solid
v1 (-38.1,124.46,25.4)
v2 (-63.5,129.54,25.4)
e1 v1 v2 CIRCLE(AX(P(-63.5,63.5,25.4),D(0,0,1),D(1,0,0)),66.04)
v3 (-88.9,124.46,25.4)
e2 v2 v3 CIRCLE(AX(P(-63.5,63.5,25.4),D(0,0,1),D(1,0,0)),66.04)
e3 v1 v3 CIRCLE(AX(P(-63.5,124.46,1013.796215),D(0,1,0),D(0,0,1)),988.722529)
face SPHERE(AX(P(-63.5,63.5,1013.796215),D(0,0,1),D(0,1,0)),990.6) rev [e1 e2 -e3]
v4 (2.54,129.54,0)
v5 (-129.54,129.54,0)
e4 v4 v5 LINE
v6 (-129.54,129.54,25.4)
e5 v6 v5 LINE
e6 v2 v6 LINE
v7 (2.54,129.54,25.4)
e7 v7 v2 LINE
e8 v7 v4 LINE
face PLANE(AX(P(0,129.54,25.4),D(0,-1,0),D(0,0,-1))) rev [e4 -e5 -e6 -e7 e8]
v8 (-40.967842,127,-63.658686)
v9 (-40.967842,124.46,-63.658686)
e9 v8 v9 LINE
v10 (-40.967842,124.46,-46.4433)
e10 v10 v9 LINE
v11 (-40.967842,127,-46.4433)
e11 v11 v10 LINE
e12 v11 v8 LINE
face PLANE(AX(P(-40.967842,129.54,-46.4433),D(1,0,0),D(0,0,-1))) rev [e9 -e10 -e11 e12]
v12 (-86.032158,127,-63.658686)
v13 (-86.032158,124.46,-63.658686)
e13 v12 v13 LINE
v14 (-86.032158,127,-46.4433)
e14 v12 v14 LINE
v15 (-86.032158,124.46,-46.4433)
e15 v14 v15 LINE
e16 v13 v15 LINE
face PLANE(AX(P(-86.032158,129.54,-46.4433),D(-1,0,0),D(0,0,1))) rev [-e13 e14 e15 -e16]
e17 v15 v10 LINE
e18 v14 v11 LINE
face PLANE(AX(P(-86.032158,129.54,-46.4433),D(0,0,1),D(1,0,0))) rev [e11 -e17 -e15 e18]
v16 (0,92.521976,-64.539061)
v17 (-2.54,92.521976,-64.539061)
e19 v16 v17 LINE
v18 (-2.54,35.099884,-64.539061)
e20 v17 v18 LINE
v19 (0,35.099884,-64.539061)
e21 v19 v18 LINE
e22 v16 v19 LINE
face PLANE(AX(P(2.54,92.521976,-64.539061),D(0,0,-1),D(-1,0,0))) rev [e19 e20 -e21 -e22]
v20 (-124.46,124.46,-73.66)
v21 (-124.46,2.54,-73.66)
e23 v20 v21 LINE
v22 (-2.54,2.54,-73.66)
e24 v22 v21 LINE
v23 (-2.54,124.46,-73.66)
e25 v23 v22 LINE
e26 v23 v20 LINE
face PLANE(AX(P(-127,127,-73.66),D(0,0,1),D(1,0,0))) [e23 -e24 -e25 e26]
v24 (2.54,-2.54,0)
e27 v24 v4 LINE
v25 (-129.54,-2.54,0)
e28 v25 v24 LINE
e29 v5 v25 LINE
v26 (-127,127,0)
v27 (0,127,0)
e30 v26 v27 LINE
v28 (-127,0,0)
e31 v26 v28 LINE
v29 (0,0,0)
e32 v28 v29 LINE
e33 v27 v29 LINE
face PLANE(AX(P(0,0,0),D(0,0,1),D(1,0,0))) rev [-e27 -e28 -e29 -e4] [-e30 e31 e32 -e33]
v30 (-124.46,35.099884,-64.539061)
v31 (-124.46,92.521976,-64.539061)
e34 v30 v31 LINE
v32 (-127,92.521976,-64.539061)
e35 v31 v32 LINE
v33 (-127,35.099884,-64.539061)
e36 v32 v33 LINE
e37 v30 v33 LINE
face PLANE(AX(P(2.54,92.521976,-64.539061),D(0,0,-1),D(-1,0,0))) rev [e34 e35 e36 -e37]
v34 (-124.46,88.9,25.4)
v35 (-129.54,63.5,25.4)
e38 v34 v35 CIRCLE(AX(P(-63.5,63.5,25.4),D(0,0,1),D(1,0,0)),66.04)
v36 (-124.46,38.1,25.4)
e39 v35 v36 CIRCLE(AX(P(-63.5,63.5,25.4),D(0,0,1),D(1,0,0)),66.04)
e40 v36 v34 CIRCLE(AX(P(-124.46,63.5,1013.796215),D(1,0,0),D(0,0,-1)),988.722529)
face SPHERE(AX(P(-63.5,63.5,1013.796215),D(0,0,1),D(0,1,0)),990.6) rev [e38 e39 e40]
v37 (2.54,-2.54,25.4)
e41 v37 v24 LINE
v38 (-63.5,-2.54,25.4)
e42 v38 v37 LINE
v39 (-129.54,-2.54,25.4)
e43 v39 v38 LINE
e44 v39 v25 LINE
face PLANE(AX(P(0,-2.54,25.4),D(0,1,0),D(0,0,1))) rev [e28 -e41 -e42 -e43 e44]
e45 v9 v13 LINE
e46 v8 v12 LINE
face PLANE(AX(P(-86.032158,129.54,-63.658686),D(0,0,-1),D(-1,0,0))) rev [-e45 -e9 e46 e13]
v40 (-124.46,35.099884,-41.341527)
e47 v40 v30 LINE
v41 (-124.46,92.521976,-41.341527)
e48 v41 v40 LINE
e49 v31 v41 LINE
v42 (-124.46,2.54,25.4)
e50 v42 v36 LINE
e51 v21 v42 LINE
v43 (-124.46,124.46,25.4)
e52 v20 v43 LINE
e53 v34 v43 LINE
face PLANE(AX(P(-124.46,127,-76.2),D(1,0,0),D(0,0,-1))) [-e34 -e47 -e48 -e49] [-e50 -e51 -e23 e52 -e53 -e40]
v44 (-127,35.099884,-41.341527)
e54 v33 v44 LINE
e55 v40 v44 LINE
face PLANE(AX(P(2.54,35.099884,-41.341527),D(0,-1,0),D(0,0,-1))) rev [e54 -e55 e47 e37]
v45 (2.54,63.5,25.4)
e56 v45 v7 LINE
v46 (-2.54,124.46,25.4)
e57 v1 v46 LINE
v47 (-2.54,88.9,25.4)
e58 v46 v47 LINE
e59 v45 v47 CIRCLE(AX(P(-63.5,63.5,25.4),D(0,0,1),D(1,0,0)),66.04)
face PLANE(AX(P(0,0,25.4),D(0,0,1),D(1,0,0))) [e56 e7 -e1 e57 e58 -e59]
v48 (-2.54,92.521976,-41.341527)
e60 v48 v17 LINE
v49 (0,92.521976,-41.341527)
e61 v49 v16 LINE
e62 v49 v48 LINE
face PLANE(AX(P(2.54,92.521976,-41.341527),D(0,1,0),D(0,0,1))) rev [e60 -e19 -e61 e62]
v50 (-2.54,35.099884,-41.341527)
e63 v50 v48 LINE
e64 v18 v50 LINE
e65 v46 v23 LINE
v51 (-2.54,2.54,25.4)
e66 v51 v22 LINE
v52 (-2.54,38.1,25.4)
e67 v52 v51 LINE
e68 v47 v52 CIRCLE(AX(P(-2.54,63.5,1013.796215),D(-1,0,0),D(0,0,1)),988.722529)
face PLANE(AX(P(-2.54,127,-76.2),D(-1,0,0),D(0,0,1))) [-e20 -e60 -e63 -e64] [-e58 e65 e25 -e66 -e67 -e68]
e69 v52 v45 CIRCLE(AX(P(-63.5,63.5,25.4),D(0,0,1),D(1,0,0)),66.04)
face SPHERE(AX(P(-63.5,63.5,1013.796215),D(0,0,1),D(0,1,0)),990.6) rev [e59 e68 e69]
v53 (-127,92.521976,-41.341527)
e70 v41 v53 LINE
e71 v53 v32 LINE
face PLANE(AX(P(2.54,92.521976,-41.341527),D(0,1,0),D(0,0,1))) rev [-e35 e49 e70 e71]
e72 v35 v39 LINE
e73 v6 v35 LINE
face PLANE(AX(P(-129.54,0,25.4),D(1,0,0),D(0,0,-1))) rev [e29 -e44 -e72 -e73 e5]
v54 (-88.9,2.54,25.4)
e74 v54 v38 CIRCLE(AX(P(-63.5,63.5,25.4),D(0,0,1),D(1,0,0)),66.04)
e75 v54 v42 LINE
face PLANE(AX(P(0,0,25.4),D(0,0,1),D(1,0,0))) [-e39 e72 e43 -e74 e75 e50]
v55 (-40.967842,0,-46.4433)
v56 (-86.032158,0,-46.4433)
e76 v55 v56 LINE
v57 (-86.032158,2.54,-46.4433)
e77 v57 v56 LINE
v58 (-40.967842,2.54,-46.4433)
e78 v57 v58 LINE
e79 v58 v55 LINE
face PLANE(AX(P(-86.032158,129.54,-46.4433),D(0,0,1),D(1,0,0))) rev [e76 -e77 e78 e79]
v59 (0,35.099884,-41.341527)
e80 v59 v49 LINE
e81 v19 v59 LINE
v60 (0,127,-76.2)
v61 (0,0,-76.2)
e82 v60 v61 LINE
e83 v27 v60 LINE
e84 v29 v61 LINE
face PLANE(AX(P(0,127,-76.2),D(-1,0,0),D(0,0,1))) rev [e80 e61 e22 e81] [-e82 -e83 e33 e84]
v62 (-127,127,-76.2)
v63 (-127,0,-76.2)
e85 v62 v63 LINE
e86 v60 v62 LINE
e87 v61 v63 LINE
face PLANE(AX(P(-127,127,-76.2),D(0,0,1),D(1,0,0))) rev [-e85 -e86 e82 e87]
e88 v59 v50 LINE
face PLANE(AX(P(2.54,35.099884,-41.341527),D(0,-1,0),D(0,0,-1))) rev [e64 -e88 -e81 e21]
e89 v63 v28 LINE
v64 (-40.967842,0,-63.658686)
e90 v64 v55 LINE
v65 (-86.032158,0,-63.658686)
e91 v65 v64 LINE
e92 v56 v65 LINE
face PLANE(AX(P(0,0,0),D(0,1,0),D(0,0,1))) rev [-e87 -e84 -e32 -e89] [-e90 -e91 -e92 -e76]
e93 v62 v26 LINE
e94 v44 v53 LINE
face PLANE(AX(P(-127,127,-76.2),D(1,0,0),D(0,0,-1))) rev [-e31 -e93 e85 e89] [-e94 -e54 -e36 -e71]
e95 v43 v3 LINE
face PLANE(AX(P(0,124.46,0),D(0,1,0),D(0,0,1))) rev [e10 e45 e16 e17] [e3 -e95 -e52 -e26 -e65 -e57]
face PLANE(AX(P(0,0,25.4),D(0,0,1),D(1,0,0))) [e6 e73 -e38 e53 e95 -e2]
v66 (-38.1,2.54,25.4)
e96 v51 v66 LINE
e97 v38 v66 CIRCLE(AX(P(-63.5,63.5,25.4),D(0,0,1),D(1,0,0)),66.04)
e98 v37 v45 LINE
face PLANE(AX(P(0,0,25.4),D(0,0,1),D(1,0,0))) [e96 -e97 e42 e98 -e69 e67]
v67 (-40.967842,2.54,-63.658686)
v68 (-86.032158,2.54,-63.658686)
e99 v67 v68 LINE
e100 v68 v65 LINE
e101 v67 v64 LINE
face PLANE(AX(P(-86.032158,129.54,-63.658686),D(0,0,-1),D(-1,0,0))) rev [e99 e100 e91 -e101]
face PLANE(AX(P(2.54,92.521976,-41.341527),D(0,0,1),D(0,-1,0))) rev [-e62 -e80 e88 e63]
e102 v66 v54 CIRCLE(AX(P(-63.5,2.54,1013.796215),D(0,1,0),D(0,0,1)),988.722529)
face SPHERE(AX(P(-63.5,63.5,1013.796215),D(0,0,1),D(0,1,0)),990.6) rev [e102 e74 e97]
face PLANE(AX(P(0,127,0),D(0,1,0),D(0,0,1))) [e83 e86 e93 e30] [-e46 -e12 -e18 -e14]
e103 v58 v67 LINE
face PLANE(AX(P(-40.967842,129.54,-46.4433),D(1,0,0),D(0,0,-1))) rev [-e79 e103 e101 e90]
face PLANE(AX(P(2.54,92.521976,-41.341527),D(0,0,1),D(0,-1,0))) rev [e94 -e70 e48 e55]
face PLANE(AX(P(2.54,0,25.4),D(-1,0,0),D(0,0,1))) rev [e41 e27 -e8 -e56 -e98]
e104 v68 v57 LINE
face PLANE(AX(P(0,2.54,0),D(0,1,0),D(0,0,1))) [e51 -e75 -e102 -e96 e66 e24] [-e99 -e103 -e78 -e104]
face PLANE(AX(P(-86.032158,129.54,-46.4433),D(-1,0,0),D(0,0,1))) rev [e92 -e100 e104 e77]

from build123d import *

# Parameters (mm, degrees)
SKETCH1_W           = 127
SKETCH1_H           = 76.2
BOSS_EXTRUDE1_DEPTH = 127
SHELL1_T            = -2.54
SKETCH2_W           = 132.08
SKETCH2_H           = 132.08
SKETCH2_W_2         = 121.92
SKETCH2_H_2         = 121.92
BOSS_EXTRUDE2_DEPTH = 25.4
SKETCH5_W           = 23.197534015
SKETCH5_H           = 57.422092124
CUT_EXTRUDE1_DEPTH  = 199.41286047
SKETCH6_W           = 45.064315034
SKETCH6_H           = 17.215386484
CUT_EXTRUDE2_DEPTH  = 199.41286047


with BuildPart() as part:
    # Sketch1 → Boss-Extrude1 (new body)
    with BuildSketch(Plane(origin=(0, 0, 0), x_dir=(1, 0, 0), z_dir=(0, 1, 0))):
        with Locations((-63.5, 38.1)):
            Rectangle(SKETCH1_W, SKETCH1_H)
    extrude(amount=BOSS_EXTRUDE1_DEPTH)

    # Shell1
    shell1_openings = [part.faces().sort_by_distance(p)[0] for p in [
        (-63.5, 63.5, 0),
    ]]
    offset(amount=SHELL1_T, openings=shell1_openings, kind=Kind.INTERSECTION)

    # Sketch2 → Boss-Extrude2 (add)
    with BuildSketch(Plane.XY):
        with Locations((-63.5, 63.5)):
            Rectangle(SKETCH2_W, SKETCH2_H)
        with Locations((-63.5, 63.5)):
            Rectangle(SKETCH2_W_2, SKETCH2_H_2, mode=Mode.SUBTRACT)
    extrude(amount=BOSS_EXTRUDE2_DEPTH)

    # Sketch3 → Cut-Revolve2 (revolve, cut)
    with BuildSketch(Plane.ZY.offset(63.5)):
        with BuildLine():
            ThreePointArc((23.19621529, 63.5), (1013.79621529, -927.1), (2004.39621529, 63.5))
            Line((2004.39621529, 63.5), (23.19621529, 63.5))
        make_face()
    revolve(axis=Axis((-63.5, 63.5, 2004.39621529), (0, 0, -1)), mode=Mode.SUBTRACT)

    # Sketch5 → Cut-Extrude1 (cut, through all)
    with BuildSketch(Plane.ZY.offset(127)):
        with Locations((-52.940293684, 63.810930306)):
            Rectangle(SKETCH5_W, SKETCH5_H)
    extrude(amount=-CUT_EXTRUDE1_DEPTH, mode=Mode.SUBTRACT)

    # Sketch6 → Cut-Extrude2 (cut, through all)
    with BuildSketch(Plane.XZ):
        with Locations((-63.5, -55.050992996)):
            Rectangle(SKETCH6_W, SKETCH6_H)
    extrude(amount=-CUT_EXTRUDE2_DEPTH, mode=Mode.SUBTRACT)


solid = part.part
